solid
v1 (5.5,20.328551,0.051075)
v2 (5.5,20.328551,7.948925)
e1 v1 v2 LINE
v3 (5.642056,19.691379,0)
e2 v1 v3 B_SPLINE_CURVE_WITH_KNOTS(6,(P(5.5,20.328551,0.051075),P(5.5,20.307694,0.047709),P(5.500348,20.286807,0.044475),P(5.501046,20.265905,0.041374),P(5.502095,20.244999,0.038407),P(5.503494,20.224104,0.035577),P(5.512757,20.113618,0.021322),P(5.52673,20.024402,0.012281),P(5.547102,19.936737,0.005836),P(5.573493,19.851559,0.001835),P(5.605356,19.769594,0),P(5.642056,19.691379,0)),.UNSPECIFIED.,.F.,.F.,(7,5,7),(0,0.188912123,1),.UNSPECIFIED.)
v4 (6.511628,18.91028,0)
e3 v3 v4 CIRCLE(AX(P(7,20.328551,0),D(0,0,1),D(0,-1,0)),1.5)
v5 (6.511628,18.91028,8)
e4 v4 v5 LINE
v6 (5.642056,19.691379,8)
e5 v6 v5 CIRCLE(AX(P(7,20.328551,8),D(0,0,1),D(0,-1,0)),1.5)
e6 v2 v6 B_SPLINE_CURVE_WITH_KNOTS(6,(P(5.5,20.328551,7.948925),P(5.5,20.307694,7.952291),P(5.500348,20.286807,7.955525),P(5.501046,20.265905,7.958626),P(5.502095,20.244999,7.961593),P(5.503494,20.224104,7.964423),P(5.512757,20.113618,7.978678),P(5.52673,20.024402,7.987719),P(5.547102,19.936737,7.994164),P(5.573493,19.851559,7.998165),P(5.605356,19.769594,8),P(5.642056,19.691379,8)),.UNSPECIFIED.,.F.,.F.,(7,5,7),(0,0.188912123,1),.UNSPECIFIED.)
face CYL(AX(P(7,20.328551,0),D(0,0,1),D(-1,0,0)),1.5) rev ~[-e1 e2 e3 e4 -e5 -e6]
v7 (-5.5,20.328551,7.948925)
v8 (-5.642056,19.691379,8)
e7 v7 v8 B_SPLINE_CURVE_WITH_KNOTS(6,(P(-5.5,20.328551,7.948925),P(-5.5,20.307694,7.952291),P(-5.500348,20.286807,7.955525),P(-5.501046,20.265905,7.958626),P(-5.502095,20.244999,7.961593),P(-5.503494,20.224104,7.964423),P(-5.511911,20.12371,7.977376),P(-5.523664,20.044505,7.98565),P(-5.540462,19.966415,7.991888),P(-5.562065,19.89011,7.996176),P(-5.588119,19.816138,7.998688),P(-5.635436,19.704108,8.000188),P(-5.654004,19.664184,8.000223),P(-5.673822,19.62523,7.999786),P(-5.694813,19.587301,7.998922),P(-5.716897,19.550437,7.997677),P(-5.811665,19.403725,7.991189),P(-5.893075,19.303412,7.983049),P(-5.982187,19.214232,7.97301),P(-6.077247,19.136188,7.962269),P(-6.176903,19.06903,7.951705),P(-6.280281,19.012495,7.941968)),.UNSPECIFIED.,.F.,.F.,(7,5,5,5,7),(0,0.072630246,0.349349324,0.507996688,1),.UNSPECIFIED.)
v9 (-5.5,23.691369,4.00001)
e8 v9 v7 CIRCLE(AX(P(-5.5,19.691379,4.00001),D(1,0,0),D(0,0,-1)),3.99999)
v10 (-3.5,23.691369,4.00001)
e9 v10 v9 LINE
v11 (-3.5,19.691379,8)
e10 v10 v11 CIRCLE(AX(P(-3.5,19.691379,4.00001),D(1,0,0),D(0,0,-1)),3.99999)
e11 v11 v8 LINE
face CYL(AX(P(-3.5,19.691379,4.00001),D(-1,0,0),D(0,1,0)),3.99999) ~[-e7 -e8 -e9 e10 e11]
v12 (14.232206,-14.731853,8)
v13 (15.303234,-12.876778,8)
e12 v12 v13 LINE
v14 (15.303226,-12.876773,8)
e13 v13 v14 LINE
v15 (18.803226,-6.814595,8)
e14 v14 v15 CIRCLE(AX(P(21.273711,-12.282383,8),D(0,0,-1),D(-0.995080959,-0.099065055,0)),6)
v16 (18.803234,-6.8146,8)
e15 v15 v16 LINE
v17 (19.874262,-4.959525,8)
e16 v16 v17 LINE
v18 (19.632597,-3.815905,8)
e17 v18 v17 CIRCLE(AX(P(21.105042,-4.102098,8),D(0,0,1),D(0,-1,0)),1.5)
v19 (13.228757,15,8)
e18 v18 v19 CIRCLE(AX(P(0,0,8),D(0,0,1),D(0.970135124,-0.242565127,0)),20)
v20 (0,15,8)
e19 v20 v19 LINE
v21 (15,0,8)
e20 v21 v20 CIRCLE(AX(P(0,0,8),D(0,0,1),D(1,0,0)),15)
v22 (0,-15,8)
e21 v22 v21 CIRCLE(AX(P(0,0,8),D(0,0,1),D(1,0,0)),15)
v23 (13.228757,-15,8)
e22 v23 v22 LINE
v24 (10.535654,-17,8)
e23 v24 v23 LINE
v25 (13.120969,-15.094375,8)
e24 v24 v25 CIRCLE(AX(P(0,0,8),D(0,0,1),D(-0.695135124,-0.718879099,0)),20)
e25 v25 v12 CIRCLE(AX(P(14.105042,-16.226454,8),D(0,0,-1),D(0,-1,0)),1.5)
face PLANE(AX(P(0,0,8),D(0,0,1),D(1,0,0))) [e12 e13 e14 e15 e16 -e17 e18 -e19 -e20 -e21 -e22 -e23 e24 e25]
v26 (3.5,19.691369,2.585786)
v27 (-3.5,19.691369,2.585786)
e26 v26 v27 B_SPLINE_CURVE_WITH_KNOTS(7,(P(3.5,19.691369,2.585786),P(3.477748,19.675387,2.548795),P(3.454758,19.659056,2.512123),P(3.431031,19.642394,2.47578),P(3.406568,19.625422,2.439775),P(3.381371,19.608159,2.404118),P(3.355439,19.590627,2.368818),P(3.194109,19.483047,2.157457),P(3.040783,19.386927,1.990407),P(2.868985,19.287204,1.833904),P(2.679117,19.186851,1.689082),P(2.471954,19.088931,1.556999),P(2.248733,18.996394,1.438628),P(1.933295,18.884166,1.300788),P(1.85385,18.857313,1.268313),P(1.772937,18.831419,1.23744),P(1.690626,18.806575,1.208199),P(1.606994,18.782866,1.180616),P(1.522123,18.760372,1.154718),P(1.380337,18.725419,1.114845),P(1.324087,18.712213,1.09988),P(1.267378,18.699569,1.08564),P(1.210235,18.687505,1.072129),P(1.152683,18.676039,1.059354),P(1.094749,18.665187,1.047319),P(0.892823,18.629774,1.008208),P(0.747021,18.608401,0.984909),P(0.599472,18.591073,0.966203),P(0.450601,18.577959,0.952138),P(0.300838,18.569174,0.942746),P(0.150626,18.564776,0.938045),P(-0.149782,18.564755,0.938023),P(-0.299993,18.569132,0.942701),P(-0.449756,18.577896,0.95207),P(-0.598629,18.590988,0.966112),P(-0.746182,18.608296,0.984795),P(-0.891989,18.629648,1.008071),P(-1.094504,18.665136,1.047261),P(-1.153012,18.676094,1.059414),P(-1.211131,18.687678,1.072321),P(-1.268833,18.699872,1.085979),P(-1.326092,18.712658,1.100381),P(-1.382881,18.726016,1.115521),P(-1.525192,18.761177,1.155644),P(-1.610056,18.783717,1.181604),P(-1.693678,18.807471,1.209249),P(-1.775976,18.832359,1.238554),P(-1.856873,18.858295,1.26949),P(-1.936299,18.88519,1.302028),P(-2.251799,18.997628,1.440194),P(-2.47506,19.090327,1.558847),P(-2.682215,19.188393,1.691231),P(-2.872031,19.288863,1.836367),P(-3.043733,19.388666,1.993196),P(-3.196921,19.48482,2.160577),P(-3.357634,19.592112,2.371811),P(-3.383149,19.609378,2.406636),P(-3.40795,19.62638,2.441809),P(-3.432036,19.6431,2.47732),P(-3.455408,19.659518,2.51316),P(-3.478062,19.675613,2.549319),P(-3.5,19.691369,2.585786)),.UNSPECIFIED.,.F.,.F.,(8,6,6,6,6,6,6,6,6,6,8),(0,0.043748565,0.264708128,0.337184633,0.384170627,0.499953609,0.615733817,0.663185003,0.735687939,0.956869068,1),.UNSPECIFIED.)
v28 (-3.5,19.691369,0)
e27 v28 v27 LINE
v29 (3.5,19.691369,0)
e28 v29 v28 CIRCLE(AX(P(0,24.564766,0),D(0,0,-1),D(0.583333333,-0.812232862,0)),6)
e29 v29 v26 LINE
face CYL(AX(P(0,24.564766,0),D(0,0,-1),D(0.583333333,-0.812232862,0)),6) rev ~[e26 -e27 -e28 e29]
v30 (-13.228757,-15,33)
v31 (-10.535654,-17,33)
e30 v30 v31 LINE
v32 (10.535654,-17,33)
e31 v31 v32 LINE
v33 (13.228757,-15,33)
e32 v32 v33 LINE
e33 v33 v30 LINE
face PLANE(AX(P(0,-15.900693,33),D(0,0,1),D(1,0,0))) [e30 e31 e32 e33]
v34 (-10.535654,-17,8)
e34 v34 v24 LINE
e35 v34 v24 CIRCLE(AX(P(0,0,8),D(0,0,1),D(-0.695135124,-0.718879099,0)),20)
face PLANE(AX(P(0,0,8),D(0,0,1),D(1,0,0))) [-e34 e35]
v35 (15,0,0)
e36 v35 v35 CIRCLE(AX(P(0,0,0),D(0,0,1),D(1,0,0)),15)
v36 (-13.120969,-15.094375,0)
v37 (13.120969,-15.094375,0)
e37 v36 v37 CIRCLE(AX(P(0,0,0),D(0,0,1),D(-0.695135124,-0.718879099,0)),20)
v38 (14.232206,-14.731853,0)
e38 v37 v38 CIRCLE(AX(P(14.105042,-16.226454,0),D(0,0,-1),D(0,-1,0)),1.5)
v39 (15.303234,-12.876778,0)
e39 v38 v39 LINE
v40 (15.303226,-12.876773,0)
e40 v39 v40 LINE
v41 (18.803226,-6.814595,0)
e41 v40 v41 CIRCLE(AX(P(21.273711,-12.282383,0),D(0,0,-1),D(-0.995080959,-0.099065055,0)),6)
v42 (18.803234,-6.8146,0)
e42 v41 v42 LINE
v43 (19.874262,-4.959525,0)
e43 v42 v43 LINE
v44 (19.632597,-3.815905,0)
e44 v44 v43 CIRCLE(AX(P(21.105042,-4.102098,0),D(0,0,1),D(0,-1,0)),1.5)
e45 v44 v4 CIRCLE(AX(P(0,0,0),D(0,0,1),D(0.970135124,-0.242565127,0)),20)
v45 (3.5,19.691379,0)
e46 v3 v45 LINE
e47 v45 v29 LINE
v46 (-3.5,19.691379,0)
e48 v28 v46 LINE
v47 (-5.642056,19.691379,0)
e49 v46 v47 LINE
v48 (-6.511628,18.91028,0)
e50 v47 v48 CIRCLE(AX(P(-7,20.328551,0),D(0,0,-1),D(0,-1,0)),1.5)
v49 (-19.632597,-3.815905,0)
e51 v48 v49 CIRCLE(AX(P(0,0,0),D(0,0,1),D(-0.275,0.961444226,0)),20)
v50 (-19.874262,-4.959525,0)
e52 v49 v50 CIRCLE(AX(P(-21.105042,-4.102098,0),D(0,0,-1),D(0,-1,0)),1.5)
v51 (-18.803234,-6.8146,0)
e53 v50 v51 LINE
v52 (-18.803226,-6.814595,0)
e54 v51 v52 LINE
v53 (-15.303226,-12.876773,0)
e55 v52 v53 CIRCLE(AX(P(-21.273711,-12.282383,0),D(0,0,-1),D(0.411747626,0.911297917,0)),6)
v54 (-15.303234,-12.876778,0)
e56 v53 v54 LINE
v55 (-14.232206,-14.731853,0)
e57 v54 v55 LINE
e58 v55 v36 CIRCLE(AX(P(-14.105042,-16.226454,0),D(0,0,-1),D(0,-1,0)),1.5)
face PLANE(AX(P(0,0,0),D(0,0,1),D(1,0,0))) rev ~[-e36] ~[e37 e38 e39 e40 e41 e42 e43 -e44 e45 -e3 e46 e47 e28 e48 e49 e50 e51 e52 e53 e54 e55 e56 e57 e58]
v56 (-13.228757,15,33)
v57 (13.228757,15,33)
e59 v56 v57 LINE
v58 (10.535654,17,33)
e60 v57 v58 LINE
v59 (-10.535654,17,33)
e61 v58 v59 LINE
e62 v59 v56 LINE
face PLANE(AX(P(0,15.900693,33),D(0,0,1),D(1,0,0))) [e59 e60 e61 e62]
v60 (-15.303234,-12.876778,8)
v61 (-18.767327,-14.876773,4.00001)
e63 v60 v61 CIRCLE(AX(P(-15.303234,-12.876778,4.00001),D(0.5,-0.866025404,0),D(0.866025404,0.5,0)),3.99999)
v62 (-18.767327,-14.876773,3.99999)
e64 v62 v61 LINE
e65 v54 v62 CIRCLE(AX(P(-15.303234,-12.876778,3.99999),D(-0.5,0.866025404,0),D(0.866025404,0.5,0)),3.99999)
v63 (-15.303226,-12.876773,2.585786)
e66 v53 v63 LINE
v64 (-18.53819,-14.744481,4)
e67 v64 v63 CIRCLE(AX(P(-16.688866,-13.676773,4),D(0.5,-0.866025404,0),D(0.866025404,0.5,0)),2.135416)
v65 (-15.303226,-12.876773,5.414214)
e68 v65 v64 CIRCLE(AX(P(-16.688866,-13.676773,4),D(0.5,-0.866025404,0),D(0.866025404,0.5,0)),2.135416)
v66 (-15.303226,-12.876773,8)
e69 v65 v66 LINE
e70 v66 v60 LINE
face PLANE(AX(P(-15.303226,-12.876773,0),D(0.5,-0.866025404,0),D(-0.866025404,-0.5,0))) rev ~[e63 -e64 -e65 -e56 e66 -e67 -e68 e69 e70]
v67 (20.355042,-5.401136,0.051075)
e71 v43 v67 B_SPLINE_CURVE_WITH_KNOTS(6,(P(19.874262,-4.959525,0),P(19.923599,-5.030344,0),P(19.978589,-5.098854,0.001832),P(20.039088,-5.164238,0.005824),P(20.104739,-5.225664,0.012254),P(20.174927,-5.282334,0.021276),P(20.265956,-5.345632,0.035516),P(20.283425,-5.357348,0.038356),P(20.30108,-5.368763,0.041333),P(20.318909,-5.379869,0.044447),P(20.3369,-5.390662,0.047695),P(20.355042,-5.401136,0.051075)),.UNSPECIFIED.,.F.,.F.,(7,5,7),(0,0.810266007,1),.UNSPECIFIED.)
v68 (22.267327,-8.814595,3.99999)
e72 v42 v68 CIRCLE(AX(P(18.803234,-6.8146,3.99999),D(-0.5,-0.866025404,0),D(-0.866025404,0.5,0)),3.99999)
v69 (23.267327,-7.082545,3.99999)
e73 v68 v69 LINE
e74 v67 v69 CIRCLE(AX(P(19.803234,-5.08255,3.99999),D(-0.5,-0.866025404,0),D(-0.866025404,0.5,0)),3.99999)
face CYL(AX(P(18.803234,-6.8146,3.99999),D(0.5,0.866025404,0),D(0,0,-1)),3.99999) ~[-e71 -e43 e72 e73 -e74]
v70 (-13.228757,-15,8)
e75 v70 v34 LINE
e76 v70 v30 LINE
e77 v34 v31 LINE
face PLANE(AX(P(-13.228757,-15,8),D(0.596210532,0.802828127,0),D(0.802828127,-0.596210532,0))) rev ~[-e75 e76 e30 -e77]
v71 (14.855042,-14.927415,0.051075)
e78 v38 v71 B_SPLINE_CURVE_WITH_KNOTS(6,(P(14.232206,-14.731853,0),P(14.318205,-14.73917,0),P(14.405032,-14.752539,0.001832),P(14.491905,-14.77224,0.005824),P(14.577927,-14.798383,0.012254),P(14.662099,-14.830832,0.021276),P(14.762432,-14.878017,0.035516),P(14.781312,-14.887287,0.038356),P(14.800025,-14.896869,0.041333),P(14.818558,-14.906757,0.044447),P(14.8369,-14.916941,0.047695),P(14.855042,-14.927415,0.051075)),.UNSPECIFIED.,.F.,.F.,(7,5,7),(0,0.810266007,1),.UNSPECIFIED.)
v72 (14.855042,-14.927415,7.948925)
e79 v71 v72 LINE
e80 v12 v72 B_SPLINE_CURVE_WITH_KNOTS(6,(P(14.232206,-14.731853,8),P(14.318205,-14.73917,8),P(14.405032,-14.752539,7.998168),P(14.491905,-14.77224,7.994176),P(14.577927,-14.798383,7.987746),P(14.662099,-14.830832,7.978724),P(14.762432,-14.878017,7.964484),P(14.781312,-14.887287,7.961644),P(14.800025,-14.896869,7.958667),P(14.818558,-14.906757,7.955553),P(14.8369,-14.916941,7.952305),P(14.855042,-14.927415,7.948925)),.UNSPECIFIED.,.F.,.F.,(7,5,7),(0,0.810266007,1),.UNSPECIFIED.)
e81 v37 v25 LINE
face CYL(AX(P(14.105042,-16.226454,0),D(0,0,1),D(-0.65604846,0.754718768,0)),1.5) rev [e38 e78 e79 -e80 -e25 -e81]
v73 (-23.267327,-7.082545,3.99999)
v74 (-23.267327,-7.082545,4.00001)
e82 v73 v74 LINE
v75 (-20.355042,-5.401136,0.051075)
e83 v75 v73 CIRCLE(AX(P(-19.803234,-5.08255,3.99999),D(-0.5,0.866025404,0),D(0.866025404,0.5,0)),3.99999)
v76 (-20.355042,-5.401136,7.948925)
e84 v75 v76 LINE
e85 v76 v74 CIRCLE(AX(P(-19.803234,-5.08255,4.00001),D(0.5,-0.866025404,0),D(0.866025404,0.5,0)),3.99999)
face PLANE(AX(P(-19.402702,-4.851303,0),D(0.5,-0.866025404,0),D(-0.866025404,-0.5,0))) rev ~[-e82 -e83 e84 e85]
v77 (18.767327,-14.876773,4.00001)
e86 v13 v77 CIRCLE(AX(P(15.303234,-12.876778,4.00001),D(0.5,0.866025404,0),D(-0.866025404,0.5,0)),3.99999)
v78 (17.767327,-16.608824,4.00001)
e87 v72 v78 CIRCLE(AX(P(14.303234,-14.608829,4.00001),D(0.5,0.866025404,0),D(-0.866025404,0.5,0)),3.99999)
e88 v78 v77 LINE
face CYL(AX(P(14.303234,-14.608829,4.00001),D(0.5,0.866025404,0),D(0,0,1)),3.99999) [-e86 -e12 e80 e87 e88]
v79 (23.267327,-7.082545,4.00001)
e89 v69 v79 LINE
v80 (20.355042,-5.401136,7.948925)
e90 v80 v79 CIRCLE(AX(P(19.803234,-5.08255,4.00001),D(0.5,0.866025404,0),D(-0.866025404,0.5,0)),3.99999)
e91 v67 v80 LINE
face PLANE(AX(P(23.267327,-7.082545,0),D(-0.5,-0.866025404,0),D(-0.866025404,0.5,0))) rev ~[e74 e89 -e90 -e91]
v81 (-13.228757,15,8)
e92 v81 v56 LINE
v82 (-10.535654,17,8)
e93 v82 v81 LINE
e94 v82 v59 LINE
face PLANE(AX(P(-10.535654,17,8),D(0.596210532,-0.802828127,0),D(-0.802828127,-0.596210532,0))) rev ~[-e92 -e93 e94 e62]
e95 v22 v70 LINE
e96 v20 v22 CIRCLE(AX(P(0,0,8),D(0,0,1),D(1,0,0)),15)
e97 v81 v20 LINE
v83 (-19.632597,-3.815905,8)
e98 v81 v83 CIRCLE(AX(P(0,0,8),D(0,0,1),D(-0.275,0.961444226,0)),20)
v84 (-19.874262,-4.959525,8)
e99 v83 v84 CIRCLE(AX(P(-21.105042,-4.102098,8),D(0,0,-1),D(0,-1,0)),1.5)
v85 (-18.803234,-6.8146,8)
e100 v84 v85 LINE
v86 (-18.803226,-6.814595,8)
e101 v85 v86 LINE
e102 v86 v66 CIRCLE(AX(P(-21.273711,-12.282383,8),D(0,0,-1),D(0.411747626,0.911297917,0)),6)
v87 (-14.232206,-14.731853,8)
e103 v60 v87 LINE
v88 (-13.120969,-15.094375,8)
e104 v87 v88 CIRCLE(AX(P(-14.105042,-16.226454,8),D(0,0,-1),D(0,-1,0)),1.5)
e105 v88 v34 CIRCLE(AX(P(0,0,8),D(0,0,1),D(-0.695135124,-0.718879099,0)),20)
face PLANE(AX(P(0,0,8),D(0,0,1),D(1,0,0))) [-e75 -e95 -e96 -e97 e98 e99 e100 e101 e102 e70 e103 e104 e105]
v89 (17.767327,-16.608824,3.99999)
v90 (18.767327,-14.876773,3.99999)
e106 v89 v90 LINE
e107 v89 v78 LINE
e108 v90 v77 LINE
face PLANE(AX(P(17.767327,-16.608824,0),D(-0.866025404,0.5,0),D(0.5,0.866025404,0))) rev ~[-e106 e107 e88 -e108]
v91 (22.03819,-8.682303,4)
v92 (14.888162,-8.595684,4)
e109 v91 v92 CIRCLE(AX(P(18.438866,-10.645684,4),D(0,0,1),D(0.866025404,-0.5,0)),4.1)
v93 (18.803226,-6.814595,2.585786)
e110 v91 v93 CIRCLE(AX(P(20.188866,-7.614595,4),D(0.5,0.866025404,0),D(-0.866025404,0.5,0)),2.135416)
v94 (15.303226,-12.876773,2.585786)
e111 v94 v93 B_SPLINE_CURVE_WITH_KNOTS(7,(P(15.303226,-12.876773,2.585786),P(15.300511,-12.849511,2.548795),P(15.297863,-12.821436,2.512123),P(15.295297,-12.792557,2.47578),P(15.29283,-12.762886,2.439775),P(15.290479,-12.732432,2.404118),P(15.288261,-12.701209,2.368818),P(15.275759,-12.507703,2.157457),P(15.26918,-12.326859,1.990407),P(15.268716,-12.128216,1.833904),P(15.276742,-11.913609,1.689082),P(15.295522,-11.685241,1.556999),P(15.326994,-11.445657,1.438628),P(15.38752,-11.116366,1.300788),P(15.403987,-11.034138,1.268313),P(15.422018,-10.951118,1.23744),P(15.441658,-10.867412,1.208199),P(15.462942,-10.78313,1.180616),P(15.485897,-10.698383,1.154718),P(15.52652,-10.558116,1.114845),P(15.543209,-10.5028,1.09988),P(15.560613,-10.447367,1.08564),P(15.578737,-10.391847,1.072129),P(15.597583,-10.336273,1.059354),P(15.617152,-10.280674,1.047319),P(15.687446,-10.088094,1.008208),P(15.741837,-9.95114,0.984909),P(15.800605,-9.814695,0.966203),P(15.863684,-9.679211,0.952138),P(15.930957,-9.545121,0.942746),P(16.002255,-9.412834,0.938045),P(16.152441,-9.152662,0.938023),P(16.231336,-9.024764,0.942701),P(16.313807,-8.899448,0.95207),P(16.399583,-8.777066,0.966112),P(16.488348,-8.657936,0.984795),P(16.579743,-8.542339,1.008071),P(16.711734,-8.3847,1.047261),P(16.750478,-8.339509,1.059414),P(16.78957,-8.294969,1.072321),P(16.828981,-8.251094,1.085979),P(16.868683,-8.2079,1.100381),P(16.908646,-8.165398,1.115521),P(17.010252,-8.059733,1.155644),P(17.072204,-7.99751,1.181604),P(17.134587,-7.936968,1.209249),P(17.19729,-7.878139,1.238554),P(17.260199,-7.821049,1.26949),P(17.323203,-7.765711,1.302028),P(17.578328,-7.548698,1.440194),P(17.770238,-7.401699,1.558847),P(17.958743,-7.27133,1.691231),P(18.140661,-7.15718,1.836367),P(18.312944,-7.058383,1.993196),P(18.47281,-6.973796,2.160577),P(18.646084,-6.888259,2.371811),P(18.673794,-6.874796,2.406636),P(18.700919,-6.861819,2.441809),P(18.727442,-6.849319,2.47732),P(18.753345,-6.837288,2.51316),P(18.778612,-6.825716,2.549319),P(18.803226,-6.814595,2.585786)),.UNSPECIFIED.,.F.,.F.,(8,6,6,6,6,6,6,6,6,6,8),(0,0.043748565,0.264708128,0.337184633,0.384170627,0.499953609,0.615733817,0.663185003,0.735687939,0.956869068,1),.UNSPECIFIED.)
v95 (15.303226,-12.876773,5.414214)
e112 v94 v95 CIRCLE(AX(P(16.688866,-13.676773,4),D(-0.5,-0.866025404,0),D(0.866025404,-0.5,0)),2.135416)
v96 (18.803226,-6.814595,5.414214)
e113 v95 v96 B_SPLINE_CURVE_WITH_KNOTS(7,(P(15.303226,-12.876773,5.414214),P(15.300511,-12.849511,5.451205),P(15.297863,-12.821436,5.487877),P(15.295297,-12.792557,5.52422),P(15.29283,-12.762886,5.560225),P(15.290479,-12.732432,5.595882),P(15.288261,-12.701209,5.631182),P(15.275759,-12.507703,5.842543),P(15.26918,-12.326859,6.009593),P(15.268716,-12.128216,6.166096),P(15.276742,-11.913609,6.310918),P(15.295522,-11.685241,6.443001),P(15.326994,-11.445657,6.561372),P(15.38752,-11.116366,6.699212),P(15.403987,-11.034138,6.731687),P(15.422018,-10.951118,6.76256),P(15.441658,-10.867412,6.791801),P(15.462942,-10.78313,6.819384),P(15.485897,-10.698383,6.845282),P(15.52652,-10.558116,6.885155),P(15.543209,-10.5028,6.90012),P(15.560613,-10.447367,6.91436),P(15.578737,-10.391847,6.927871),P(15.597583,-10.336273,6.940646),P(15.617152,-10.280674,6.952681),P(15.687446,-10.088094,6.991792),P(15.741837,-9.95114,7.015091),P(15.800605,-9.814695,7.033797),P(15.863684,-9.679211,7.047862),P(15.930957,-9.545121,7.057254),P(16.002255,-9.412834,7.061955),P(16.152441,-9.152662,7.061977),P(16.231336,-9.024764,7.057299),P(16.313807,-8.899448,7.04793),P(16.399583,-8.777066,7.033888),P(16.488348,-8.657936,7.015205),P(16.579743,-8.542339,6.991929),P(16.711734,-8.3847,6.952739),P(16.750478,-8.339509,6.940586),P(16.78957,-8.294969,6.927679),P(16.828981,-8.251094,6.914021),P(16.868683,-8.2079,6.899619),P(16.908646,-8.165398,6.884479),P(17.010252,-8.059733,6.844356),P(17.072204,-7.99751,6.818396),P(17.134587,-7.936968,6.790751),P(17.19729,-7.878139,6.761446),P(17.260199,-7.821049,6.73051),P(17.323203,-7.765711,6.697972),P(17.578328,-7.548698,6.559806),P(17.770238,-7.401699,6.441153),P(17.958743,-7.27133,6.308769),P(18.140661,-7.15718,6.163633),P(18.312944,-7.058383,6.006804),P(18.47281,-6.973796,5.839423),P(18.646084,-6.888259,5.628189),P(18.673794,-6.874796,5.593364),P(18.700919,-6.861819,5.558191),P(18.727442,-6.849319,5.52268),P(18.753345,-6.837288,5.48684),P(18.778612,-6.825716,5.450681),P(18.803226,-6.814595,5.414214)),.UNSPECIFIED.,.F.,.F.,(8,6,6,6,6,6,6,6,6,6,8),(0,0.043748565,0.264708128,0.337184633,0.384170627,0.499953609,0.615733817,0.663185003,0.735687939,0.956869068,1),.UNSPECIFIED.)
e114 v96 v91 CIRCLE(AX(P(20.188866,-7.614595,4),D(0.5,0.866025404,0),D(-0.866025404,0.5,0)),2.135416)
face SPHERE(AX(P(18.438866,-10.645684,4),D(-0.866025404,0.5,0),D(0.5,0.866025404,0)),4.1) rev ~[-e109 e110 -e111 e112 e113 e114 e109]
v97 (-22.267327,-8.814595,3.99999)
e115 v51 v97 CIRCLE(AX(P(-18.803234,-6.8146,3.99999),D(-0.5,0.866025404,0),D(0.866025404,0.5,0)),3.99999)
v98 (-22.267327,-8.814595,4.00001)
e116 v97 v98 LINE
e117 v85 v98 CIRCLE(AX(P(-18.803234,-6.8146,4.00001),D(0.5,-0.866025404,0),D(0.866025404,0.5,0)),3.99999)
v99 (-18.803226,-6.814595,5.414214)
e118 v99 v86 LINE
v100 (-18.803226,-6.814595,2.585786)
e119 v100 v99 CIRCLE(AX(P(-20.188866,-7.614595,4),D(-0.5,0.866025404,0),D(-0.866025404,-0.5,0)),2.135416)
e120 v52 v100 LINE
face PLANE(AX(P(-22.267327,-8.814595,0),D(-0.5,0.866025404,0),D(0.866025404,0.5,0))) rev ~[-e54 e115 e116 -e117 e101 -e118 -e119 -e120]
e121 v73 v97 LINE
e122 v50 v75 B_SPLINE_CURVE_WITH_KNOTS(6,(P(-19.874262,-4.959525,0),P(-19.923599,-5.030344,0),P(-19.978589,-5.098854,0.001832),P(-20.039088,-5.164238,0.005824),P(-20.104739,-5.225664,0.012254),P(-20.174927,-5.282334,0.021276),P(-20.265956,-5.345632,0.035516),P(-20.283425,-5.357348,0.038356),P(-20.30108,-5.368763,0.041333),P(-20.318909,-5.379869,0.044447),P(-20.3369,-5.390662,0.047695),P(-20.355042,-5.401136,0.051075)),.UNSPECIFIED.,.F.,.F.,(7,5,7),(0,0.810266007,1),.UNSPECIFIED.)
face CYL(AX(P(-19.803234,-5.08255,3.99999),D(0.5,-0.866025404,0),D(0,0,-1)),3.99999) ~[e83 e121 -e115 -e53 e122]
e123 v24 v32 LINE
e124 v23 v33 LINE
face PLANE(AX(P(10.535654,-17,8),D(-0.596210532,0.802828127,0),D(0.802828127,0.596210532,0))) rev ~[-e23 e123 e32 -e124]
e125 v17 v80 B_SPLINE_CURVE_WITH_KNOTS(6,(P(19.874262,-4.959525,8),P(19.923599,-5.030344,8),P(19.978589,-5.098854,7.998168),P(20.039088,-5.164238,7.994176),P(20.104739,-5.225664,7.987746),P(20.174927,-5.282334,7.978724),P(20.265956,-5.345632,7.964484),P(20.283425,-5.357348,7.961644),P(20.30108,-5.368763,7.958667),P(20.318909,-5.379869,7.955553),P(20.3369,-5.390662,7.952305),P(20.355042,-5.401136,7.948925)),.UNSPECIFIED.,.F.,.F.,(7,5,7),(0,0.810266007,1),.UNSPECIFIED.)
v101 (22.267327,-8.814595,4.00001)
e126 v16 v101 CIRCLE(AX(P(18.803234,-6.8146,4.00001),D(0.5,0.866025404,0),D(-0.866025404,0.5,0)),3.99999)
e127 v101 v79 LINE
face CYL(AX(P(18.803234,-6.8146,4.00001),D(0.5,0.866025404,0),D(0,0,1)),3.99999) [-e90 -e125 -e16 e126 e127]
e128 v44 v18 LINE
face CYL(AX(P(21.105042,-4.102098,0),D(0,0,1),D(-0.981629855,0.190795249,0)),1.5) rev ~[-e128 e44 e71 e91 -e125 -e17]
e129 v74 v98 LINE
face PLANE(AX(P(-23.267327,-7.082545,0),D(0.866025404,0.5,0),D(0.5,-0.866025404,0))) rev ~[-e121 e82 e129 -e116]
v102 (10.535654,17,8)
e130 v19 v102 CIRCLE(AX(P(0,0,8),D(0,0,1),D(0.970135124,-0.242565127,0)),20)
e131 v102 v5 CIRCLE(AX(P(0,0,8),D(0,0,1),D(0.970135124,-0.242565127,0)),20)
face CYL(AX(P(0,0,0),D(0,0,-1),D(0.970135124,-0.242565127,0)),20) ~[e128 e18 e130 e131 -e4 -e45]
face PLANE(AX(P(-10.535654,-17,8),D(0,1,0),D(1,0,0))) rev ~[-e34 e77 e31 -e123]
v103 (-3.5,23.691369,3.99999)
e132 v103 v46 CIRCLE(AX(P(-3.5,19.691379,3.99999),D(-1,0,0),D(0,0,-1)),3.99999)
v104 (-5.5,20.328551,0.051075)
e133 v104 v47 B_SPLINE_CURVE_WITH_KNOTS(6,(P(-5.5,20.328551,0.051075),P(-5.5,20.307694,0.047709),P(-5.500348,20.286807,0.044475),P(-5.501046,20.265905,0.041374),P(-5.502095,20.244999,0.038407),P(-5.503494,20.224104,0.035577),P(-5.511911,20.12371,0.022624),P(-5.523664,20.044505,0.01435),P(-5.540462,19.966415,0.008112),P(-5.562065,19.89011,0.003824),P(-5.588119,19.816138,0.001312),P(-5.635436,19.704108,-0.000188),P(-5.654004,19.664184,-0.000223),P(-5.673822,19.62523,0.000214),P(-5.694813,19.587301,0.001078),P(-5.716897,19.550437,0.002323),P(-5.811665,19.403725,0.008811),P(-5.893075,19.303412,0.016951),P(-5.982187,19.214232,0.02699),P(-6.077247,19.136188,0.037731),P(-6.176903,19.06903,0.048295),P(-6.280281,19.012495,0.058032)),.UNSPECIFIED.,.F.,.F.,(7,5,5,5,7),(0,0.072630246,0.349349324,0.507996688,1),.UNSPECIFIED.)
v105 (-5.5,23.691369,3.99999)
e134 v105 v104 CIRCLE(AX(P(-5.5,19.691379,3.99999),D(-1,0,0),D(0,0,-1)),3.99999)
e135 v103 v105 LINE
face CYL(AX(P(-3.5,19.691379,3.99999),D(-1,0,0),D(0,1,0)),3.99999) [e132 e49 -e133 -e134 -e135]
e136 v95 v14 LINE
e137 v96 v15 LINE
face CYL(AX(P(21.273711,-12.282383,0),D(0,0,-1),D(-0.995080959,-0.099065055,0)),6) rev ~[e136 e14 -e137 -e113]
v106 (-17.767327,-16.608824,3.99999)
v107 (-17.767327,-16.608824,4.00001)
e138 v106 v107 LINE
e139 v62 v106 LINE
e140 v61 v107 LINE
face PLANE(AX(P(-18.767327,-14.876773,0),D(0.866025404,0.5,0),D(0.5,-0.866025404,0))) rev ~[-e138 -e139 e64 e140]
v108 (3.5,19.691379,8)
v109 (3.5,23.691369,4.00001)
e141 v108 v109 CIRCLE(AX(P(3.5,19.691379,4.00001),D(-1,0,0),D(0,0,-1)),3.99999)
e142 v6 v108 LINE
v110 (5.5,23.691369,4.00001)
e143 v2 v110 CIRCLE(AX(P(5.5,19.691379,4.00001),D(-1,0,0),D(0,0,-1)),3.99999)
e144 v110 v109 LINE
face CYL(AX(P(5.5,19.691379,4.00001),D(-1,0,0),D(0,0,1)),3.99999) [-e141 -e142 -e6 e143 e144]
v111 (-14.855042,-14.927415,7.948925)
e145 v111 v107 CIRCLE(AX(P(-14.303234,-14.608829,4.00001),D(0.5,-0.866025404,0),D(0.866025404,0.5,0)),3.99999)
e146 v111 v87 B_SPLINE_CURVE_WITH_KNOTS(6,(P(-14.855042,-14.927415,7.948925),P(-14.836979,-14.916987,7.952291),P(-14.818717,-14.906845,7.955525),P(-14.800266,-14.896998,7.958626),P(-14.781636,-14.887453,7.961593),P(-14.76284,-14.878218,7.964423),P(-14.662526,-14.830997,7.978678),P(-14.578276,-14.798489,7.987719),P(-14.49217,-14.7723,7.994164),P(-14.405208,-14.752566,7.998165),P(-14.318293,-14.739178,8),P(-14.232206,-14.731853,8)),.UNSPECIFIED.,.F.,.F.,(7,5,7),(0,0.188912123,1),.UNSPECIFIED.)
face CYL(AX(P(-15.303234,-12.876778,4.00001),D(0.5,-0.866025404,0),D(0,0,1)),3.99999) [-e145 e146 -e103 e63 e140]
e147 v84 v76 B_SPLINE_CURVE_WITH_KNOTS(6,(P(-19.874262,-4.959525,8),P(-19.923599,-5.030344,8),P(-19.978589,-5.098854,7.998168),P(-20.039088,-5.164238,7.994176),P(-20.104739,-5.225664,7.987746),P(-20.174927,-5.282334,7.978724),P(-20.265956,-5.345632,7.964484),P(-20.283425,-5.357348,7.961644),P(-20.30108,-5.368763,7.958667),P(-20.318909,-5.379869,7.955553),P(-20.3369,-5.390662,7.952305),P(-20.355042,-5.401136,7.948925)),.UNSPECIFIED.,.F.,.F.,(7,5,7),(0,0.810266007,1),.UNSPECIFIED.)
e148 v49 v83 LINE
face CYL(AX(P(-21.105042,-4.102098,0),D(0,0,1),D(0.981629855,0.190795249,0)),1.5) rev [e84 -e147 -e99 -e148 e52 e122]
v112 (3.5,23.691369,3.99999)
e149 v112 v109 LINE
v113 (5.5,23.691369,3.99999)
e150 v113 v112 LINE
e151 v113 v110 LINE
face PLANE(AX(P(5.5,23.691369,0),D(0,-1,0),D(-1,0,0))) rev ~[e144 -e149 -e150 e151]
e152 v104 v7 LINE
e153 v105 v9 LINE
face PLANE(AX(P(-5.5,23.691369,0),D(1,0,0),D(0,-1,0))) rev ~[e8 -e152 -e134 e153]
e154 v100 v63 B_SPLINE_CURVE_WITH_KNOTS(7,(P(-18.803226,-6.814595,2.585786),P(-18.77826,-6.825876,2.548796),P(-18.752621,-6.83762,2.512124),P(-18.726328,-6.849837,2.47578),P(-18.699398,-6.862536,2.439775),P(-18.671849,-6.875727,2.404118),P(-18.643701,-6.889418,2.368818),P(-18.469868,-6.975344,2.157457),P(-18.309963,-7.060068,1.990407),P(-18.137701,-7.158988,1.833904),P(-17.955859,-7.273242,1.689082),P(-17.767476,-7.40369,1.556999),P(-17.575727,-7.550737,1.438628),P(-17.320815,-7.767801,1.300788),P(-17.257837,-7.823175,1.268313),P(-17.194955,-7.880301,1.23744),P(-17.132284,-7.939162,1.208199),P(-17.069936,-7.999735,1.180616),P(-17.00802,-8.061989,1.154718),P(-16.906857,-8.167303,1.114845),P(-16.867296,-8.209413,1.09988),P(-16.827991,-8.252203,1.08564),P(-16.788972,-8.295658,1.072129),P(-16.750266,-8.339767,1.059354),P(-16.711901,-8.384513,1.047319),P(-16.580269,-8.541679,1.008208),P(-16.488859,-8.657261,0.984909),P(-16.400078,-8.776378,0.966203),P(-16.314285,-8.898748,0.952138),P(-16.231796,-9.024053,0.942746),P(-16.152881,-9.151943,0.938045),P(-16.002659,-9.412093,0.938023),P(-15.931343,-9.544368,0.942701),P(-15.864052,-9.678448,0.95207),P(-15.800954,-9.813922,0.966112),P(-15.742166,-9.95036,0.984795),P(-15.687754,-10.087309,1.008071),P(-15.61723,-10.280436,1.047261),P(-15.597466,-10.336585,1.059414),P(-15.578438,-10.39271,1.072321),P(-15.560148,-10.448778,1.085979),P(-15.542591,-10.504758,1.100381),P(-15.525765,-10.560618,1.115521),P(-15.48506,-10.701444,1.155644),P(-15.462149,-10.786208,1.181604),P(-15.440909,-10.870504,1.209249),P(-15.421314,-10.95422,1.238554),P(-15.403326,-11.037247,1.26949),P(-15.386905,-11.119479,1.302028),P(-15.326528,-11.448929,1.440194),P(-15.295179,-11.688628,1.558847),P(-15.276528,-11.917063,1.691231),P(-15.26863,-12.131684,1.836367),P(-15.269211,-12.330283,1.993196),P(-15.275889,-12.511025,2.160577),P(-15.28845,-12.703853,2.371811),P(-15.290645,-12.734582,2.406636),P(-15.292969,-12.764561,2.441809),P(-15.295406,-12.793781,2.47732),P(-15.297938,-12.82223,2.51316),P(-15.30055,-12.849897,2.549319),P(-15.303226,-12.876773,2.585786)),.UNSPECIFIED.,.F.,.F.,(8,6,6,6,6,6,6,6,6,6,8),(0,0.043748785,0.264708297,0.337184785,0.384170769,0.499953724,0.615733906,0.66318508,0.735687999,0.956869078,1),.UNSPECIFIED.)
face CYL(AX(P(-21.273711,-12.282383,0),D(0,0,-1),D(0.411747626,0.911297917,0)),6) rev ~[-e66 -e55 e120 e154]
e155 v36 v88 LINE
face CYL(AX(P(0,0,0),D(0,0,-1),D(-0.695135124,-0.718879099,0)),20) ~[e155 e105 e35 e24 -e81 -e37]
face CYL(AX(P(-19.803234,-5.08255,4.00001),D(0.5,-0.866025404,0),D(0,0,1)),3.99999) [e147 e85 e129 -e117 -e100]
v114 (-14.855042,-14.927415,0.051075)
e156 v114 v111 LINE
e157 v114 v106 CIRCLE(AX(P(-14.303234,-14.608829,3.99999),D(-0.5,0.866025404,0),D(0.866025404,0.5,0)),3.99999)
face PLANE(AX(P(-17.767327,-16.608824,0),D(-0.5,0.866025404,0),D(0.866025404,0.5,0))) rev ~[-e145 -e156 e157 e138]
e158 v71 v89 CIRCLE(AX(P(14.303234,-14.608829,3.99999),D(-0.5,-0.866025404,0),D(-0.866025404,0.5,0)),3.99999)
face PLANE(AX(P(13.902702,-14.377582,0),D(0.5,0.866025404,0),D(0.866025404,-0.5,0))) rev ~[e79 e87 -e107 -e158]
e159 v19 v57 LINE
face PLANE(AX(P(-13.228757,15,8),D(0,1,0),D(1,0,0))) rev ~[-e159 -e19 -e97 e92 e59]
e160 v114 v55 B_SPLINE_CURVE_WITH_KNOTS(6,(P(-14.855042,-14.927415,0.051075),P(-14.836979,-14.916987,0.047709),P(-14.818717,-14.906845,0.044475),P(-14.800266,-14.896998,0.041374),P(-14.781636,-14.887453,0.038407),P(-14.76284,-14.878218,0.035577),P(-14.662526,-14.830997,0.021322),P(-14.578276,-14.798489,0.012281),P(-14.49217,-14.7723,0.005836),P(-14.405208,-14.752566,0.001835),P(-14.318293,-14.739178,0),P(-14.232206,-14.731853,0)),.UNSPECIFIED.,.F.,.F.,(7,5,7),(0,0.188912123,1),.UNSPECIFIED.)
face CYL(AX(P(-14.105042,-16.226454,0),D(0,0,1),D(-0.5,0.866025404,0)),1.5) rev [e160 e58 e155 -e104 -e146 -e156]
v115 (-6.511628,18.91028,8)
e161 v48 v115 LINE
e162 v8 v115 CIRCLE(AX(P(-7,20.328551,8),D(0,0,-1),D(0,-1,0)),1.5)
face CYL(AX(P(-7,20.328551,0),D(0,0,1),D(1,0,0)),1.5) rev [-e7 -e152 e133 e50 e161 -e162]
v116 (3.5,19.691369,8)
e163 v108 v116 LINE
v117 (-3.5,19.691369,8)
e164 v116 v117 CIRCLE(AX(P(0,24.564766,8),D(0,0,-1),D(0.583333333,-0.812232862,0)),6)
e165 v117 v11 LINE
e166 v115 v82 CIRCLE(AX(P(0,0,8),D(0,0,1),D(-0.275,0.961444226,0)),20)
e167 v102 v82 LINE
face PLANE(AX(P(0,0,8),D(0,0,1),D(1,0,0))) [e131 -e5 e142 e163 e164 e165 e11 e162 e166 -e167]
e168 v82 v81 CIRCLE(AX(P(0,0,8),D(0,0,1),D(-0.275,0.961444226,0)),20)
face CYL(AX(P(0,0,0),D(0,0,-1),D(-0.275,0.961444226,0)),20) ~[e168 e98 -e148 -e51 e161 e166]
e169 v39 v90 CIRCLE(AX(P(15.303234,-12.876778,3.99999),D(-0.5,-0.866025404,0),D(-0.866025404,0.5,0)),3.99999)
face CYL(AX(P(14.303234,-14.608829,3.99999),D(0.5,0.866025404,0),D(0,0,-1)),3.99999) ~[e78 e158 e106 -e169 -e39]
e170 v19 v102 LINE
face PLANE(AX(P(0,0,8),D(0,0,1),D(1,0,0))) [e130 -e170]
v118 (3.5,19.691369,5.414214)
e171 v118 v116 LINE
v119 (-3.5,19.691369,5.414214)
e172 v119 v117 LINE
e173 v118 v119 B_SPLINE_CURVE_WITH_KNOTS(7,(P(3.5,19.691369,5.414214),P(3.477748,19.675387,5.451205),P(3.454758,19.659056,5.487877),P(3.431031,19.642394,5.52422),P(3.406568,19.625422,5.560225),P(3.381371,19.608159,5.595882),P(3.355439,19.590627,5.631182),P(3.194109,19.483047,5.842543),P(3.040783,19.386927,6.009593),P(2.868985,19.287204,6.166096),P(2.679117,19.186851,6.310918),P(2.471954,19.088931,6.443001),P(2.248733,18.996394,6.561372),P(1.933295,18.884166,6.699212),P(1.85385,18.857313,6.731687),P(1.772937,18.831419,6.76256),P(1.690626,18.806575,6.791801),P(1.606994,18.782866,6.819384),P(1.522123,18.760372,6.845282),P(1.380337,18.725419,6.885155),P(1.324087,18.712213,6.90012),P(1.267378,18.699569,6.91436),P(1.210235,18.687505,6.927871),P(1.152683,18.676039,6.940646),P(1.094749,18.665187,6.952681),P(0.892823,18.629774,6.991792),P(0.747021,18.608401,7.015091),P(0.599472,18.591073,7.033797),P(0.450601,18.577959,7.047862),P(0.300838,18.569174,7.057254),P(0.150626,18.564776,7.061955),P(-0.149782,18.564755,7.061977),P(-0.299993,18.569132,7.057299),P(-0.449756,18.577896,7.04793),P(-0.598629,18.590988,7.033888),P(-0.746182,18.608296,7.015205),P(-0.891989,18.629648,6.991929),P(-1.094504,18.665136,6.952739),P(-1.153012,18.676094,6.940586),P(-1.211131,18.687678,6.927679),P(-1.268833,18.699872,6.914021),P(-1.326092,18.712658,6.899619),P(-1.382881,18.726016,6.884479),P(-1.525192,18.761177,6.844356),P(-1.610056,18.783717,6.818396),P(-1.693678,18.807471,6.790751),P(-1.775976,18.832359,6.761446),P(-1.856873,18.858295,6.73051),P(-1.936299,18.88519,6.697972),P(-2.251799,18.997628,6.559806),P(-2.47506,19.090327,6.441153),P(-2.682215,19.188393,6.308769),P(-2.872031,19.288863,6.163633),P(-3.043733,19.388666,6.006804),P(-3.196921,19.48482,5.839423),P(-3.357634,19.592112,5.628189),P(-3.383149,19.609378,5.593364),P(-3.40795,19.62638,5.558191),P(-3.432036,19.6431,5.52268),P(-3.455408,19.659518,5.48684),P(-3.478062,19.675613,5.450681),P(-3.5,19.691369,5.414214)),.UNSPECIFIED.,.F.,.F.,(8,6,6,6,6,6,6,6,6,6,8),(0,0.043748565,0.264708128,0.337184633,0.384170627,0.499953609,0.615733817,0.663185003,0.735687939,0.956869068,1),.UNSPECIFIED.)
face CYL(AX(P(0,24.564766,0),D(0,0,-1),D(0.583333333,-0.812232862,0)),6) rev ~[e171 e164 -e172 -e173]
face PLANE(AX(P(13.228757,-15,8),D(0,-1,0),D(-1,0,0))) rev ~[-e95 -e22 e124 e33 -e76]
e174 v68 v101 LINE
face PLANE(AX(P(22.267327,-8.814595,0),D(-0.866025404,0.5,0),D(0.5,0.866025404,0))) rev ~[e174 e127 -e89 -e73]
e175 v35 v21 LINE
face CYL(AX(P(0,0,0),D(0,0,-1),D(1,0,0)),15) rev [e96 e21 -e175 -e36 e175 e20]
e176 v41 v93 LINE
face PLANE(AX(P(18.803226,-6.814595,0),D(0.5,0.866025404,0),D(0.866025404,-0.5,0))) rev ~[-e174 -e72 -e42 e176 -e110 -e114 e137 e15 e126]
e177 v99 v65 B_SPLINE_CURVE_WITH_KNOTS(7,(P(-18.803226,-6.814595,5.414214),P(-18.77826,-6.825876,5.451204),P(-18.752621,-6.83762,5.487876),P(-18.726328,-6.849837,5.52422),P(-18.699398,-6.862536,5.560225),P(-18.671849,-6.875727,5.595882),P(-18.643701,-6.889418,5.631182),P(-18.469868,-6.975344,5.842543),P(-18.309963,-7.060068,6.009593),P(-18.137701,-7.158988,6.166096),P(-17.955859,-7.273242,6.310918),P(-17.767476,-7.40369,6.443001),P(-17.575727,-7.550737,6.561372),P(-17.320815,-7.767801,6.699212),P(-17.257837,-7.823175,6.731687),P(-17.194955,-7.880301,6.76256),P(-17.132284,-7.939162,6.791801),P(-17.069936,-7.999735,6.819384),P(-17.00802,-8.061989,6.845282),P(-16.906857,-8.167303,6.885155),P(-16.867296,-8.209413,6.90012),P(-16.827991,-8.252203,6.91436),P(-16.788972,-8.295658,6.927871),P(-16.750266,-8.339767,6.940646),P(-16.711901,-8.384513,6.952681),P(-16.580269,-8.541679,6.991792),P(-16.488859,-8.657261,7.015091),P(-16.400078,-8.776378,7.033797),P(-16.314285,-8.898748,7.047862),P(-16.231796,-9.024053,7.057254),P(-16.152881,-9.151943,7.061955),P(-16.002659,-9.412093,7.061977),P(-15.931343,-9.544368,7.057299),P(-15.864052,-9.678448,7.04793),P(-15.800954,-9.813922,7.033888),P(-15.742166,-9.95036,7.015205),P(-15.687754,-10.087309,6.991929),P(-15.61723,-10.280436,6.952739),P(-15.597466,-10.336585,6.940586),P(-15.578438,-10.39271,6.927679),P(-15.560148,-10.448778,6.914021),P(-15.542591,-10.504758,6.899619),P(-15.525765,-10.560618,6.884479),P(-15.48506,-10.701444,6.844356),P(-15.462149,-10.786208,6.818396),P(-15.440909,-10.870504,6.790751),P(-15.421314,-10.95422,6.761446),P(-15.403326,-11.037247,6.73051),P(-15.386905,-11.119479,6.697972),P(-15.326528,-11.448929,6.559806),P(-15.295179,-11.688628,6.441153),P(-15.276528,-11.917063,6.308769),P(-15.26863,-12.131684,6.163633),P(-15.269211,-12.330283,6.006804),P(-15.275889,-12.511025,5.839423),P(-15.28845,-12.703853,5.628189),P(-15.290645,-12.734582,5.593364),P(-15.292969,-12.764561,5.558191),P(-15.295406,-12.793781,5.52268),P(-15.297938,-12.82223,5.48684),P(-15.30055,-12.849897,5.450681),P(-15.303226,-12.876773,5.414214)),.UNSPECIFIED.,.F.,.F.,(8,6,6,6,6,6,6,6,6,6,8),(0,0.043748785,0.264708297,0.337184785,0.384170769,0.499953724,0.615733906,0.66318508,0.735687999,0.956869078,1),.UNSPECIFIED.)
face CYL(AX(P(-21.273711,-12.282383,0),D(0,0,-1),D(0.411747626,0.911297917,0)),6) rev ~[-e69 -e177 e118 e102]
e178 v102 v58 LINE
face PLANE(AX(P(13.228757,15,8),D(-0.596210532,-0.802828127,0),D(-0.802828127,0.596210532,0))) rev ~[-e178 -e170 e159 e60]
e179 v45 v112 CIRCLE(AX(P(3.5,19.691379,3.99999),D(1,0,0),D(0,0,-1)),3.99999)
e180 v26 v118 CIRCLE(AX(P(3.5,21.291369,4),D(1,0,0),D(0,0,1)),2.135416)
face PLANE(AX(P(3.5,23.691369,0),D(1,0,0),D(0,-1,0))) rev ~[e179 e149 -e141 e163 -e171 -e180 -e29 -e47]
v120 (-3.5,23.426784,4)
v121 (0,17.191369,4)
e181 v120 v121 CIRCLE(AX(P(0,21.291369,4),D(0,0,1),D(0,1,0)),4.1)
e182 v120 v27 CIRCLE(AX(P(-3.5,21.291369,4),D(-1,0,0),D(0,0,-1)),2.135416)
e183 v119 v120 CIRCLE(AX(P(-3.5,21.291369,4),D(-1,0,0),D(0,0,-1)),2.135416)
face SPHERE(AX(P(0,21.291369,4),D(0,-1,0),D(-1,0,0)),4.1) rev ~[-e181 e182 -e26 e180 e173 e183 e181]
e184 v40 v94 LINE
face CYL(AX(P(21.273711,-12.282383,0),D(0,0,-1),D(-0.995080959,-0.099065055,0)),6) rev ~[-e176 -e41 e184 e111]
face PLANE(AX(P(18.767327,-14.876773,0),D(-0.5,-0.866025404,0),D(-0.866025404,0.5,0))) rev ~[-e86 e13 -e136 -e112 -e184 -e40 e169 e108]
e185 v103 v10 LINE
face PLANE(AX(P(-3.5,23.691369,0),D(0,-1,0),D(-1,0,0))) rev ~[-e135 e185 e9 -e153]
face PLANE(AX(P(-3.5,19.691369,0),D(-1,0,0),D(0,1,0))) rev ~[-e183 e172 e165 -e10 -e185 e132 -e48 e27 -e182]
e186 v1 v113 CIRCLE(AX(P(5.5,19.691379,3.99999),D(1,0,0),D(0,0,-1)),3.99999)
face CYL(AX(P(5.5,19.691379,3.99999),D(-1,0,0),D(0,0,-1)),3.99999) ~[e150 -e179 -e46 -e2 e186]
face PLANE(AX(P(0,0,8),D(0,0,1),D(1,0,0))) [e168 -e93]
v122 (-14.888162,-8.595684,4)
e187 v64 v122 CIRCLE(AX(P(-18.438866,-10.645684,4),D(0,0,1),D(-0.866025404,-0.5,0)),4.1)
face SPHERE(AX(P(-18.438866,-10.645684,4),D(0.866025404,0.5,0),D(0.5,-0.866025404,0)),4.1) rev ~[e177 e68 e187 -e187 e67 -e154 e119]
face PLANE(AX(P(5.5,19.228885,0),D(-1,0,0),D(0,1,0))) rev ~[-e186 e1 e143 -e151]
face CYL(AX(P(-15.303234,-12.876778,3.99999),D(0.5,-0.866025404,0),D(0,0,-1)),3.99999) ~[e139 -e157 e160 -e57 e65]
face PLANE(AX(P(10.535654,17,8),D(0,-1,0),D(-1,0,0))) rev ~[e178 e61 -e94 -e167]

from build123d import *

# Parameters (mm, degrees)
F0_R            = 15
F2_DEPTH        = 8
F5_COPIES_COUNT = 3
F6_R            = 3.99999
F7_R            = 1.5
F9_DEPTH        = 25


# Not quite as in the source:
# - a fillet or chamfer is up to 0.001 mm smaller than in the source, because OpenCascade refuses the exact size
# - a pattern or mirror of a feature is missing from the dataset's text; its kind, count and spacing are read off the source's solid


with BuildPart() as f2:
    # F0 (on Top) → F2 (new body)
    with BuildSketch(Plane.XY):
        with BuildLine():
            Line((-5.5, 23.6913686675), (-5.5, 19.228884523))
            ThreePointArc((-5.5, 19.228884523), (-17.3205080757, 10), (-19.4027024834, -4.8513025407))
            Line((-19.4027024834, -4.8513025407), (-23.2673271165, -7.0825446129))
            Line((-23.2673271165, -7.0825446129), (-22.2673271165, -8.8145954205))
            Line((-22.2673271165, -8.8145954205), (-18.8032255014, -6.8145954205))
            ThreePointArc((-18.8032255014, -6.8145954205), (-16.0775588327, -9.28238292), (-15.3032255014, -12.876773247))
            Line((-15.3032255014, -12.876773247), (-18.7673271165, -14.876773247))
            Line((-18.7673271165, -14.876773247), (-17.7673271165, -16.6088240546))
            Line((-17.7673271165, -16.6088240546), (-13.9027024834, -14.3775819823))
            ThreePointArc((-13.9027024834, -14.3775819823), (0, -20), (13.9027024834, -14.3775819823))
            Line((13.9027024834, -14.3775819823), (17.7673271165, -16.6088240546))
            Line((17.7673271165, -16.6088240546), (18.7673271165, -14.876773247))
            Line((18.7673271165, -14.876773247), (15.3032255014, -12.876773247))
            ThreePointArc((15.3032255014, -12.876773247), (16.0775588327, -9.28238292), (18.8032255014, -6.8145954205))
            Line((18.8032255014, -6.8145954205), (22.2673271165, -8.8145954205))
            Line((22.2673271165, -8.8145954205), (23.2673271165, -7.0825446129))
            Line((23.2673271165, -7.0825446129), (19.4027024834, -4.8513025407))
            ThreePointArc((19.4027024834, -4.8513025407), (17.3205080757, 10), (5.5, 19.228884523))
            Line((5.5, 19.228884523), (5.5, 23.6913686675))
            Line((5.5, 23.6913686675), (3.5, 23.6913686675))
            Line((3.5, 23.6913686675), (3.5, 19.6913686675))
            ThreePointArc((3.5, 19.6913686675), (0, 18.5647658399), (-3.5, 19.6913686675))
            Line((-3.5, 19.6913686675), (-3.5, 23.6913686675))
            Line((-3.5, 23.6913686675), (-5.5, 23.6913686675))
        make_face()
        Circle(F0_R, mode=Mode.SUBTRACT)
    extrude(amount=F2_DEPTH)

    # F4 (on offset) → F5 (revolve, cut)
    with BuildSketch(Plane.XY.offset(4)):
        with BuildLine():
            Line((0, 17.1913686675), (0, 25.3913686675))
            ThreePointArc((0, 25.3913686675), (-4.1, 21.2913686675), (0, 17.1913686675))
        make_face()
    f5 = revolve(axis=Axis((0, 21.2913686675, 4), (0, -1, 0)), mode=Mode.SUBTRACT)

    # F5_copies: F5 ×3 about axis
    f5_copies_axis = Axis((0, 0, 0), (0, 0, 1))
    for i in range(1, F5_COPIES_COUNT):
        add(f5.rotate(f5_copies_axis, i * 360 / F5_COPIES_COUNT), mode=Mode.SUBTRACT)

    # F6 (radius 4 in the source; OpenCascade refuses exactly that, so slightly less here)
    f6_edges = [f2.edges().sort_by_distance(p)[0] for p in [
        (-4.5, 23.691369, 8),
        (4.5, 23.691369, 8),
        (22.767327, -7.94857, 8),
        (18.267327, -15.742799, 8),
        (-18.267327, -15.742799, 8),
        (-22.767327, -7.94857, 8),
        (-18.267327, -15.742799, 0),
        (-22.767327, -7.94857, 0),
        (18.267327, -15.742799, 0),
        (22.767327, -7.94857, 0),
        (4.5, 23.691369, 0),
        (-4.5, 23.691369, 0),
    ]]
    fillet(f6_edges, radius=F6_R)

    # F7
    f7_edges = [f2.edges().sort_by_distance(p)[0] for p in [
        (-19.402702, -4.851303, 4),
        (-5.5, 19.228885, 4),
        (5.5, 19.228885, 4),
        (19.402702, -4.851303, 4),
        (13.902702, -14.377582, 4),
        (-13.902702, -14.377582, 4),
    ]]
    fillet(f7_edges, radius=F7_R)

    # F8 (on face) → F9 (join)
    with BuildSketch(Plane.XY.offset(8)):
        Polygon((-10.5356537529, 17), (-13.2287565553, 15), (-1.63e-08, 15), (13.2287565553, 15), (10.5356537529, 17), align=None)
        Polygon((13.2287565553, -15), (0, -15), (-13.2287565553, -15), (-10.5356537529, -17), (10.5356537529, -17), align=None)
    extrude(amount=F9_DEPTH)


solid = f2.part
